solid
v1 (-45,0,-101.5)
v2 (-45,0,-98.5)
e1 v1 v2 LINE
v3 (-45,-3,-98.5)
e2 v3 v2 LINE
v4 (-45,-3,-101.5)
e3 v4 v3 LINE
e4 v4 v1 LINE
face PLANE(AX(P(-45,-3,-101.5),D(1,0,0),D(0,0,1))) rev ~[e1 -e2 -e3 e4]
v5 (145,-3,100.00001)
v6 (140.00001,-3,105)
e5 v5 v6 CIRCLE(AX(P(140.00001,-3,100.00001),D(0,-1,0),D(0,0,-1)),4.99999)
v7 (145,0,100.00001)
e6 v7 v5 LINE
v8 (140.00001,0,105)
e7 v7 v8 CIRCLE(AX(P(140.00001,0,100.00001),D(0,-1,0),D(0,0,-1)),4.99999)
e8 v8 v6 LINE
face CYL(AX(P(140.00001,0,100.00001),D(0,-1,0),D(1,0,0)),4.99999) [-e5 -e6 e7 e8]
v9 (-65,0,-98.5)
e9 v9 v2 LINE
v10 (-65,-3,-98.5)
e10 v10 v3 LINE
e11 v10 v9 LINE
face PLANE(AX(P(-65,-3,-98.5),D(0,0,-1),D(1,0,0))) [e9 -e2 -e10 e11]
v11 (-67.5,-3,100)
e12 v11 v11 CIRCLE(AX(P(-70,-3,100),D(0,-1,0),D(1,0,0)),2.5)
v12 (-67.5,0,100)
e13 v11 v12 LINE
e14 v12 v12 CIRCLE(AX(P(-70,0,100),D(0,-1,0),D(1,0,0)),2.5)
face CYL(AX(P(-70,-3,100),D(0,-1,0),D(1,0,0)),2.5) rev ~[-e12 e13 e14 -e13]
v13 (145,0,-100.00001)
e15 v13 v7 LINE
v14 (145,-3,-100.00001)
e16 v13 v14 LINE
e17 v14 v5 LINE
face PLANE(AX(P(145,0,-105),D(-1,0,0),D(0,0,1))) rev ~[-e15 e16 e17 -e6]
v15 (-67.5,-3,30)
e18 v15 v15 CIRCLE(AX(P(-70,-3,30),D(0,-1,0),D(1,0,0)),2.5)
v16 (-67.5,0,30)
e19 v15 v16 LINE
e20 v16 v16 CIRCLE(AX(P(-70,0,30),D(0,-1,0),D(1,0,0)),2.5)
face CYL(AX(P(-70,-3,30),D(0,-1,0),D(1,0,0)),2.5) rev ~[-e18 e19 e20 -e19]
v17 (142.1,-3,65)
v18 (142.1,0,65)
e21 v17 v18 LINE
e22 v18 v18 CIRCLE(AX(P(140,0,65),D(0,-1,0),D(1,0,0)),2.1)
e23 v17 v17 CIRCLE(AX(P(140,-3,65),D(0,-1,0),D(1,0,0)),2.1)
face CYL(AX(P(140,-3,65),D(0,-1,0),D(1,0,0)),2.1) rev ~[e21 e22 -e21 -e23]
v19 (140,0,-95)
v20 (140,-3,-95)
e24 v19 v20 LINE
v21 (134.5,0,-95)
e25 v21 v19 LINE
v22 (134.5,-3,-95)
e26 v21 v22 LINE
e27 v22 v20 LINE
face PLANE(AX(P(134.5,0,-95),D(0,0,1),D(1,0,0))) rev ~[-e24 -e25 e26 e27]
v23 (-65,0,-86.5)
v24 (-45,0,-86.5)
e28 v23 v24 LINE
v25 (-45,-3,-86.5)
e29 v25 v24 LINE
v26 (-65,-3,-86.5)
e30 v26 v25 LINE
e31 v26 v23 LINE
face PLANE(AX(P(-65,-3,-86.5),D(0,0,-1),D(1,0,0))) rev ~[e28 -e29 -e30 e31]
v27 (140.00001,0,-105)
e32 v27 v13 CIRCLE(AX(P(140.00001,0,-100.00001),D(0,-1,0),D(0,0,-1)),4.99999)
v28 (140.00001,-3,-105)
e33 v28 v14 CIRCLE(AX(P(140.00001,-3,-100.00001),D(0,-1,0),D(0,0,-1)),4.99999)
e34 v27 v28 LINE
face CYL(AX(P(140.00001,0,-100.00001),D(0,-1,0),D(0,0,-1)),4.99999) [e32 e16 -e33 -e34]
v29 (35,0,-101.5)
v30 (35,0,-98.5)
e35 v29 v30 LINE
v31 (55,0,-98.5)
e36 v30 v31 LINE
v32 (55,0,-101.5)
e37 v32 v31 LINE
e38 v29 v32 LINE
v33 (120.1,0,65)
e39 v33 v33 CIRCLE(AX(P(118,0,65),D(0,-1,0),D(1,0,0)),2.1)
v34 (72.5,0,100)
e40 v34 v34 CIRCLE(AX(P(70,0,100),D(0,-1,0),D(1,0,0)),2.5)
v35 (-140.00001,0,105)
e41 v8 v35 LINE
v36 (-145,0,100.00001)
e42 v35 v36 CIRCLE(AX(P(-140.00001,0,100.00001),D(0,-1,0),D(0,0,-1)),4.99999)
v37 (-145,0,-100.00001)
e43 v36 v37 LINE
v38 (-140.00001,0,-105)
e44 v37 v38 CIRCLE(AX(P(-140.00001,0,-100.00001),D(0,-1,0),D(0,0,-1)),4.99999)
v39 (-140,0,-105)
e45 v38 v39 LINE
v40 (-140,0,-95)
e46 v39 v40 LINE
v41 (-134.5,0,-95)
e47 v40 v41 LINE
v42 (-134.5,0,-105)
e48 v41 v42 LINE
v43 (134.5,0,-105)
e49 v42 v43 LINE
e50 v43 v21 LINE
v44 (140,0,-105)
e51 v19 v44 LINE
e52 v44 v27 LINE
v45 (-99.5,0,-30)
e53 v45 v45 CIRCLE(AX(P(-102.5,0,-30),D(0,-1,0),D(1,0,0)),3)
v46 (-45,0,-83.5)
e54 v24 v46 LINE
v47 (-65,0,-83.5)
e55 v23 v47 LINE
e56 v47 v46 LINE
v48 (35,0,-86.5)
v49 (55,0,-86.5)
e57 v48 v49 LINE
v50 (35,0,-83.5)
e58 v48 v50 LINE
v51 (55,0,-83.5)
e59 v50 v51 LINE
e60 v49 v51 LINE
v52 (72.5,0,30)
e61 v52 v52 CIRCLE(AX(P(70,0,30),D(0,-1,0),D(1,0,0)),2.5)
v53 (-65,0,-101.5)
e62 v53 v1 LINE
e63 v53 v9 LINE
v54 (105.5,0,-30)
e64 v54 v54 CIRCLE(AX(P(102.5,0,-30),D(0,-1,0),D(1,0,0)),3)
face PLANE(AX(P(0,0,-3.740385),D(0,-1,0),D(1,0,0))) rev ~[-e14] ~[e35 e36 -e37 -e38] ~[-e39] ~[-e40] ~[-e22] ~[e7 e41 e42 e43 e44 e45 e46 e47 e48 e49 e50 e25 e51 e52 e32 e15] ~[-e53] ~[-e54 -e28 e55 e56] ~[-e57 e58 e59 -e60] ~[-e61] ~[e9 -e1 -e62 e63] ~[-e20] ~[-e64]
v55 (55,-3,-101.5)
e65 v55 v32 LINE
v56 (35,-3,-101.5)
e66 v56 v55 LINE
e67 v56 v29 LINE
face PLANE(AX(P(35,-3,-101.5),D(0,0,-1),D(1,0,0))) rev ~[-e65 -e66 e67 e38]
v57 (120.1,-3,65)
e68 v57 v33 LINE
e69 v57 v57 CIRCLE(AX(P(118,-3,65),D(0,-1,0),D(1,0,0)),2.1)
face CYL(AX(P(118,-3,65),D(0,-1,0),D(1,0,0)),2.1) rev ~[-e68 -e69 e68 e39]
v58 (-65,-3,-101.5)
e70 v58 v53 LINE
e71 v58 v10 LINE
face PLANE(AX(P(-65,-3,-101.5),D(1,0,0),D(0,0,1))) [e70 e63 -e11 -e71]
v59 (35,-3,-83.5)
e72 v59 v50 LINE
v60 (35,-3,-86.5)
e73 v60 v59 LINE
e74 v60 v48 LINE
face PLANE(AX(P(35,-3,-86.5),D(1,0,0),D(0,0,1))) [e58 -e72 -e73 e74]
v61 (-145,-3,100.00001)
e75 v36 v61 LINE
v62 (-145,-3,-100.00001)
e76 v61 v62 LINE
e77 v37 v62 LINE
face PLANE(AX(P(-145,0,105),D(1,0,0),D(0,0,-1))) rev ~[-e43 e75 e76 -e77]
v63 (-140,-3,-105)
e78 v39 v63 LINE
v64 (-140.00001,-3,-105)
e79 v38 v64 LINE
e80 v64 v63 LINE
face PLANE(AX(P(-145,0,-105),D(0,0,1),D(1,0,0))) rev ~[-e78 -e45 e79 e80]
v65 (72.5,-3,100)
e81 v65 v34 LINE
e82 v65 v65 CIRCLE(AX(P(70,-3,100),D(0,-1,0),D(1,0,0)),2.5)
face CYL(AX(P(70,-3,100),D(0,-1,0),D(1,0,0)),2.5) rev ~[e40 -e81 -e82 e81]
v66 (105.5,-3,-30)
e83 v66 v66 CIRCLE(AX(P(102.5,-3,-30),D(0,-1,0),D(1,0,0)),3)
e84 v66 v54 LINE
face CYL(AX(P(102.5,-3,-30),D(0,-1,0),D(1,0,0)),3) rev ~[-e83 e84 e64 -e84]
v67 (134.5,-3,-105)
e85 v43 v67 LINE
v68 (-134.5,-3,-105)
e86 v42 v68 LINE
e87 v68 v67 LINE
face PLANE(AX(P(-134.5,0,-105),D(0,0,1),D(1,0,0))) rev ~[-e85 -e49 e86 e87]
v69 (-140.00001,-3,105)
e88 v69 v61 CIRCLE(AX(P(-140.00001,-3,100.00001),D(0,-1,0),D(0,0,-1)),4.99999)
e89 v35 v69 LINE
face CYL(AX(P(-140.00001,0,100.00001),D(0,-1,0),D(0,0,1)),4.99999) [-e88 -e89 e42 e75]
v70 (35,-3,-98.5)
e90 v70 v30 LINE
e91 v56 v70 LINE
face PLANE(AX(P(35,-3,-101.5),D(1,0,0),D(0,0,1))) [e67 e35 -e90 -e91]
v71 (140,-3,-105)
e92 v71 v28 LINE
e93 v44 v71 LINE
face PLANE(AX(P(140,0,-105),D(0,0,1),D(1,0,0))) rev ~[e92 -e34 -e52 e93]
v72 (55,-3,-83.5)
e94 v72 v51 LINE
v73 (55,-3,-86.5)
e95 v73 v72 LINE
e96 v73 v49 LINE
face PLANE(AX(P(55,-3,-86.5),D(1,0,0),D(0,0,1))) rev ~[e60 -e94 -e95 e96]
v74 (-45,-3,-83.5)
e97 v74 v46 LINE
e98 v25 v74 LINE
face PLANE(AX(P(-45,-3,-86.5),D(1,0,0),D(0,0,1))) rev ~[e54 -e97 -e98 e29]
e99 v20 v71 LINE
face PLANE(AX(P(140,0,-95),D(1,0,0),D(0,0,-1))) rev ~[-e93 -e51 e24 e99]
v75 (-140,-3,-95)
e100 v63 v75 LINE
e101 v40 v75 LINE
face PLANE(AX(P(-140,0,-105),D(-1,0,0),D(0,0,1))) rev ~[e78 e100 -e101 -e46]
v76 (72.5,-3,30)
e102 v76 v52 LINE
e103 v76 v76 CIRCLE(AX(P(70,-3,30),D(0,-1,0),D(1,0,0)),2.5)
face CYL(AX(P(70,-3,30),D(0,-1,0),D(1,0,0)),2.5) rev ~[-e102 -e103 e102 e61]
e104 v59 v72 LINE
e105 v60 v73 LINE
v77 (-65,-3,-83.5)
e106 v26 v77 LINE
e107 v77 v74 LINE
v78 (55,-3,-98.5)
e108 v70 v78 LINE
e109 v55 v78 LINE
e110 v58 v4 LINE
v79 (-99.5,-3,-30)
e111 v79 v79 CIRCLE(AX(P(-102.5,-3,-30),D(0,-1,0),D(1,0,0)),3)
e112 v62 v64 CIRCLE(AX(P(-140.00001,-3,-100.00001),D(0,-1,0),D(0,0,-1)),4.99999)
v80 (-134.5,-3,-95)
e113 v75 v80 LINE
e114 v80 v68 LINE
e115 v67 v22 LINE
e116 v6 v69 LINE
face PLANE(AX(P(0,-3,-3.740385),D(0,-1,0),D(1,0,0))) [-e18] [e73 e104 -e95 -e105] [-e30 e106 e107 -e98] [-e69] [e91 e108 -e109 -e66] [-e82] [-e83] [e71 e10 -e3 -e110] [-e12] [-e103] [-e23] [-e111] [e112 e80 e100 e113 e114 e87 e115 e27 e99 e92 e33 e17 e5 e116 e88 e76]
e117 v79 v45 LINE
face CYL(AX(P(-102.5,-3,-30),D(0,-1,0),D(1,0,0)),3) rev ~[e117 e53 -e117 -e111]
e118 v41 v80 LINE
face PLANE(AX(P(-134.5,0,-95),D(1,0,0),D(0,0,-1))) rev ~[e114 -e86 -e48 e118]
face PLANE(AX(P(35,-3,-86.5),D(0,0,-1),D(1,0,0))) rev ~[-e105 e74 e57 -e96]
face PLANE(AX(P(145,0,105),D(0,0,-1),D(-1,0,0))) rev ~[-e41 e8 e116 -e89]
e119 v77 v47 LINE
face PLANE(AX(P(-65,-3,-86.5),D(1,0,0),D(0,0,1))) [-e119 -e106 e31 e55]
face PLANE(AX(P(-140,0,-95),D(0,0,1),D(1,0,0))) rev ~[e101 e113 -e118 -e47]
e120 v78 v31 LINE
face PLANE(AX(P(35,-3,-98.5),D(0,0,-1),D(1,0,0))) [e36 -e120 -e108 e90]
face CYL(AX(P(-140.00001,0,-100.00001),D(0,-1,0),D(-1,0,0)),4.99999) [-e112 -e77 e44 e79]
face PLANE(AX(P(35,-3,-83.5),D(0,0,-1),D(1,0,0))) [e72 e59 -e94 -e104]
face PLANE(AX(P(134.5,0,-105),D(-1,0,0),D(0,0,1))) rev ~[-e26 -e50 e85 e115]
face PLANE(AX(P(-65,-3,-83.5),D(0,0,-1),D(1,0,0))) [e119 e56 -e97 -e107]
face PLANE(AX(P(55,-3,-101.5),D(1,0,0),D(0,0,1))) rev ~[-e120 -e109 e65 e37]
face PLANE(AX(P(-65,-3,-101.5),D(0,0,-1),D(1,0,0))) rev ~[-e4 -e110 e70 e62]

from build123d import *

# Parameters (mm, degrees)
F1_DEPTH = 3
F2_R     = 2.5
F3_DEPTH = 3
F4_R     = 3
F5_DEPTH = 3
F6_R     = 2.1
F7_DEPTH = 3
F8_W     = 20
F8_H     = 3
F9_DEPTH = 3
F10_R    = 4.99999


# Not quite as in the source:
# - a fillet or chamfer is up to 0.001 mm smaller than in the source, because OpenCascade refuses the exact size


with BuildPart() as f1:
    # F0 (on Front) → F1 (new body)
    with BuildSketch(Plane.XZ):
        Polygon((140, -105), (145, -105), (145, 105), (-145, 105), (-145, -105), (-140, -105), (-140, -95), (-134.5, -95), (-134.5, -105), (134.5, -105), (134.5, -95), (140, -95), align=None)
    extrude(amount=F1_DEPTH)

    # F2 (on face) → F3 (cut, through all)
    with BuildSketch(Plane.XZ.offset(3)):
        with Locations((-70, 100)):
            Circle(F2_R)
        with Locations((-70, 30)):
            Circle(F2_R)
        with Locations((70, 100)):
            Circle(F2_R)
        with Locations((70, 30)):
            Circle(F2_R)
    extrude(amount=-F3_DEPTH, mode=Mode.SUBTRACT)

    # F4 (on face) → F5 (cut, through all)
    with BuildSketch(Plane.XZ.offset(3)):
        with Locations((102.5, -30)):
            Circle(F4_R)
        with Locations((-102.5, -30)):
            Circle(F4_R)
    extrude(amount=-F5_DEPTH, mode=Mode.SUBTRACT)

    # F6 (on face) → F7 (cut, through all)
    with BuildSketch(Plane.XZ.offset(3)):
        with Locations((118, 65)):
            Circle(F6_R)
        with Locations((140, 65)):
            Circle(F6_R)
    extrude(amount=-F7_DEPTH, mode=Mode.SUBTRACT)

    # F8 (on face) → F9 (cut, through all)
    with BuildSketch(Plane.XZ.offset(3)):
        with Locations((-55, -85)):
            Rectangle(F8_W, F8_H)
        with Locations((45, -85)):
            Rectangle(F8_W, F8_H)
        with Locations((45, -100)):
            Rectangle(F8_W, F8_H)
        with Locations((-55, -100)):
            Rectangle(F8_W, F8_H)
    extrude(amount=-F9_DEPTH, mode=Mode.SUBTRACT)

    # F10 (radius 5 in the source; OpenCascade refuses exactly that, so slightly less here)
    f10_edges = [f1.edges().sort_by_distance(p)[0] for p in [
        (-145, -1.5, 105),
        (-145, -1.5, -105),
        (145, -1.5, -105),
        (145, -1.5, 105),
    ]]
    fillet(f10_edges, radius=F10_R)


solid = f1.part
